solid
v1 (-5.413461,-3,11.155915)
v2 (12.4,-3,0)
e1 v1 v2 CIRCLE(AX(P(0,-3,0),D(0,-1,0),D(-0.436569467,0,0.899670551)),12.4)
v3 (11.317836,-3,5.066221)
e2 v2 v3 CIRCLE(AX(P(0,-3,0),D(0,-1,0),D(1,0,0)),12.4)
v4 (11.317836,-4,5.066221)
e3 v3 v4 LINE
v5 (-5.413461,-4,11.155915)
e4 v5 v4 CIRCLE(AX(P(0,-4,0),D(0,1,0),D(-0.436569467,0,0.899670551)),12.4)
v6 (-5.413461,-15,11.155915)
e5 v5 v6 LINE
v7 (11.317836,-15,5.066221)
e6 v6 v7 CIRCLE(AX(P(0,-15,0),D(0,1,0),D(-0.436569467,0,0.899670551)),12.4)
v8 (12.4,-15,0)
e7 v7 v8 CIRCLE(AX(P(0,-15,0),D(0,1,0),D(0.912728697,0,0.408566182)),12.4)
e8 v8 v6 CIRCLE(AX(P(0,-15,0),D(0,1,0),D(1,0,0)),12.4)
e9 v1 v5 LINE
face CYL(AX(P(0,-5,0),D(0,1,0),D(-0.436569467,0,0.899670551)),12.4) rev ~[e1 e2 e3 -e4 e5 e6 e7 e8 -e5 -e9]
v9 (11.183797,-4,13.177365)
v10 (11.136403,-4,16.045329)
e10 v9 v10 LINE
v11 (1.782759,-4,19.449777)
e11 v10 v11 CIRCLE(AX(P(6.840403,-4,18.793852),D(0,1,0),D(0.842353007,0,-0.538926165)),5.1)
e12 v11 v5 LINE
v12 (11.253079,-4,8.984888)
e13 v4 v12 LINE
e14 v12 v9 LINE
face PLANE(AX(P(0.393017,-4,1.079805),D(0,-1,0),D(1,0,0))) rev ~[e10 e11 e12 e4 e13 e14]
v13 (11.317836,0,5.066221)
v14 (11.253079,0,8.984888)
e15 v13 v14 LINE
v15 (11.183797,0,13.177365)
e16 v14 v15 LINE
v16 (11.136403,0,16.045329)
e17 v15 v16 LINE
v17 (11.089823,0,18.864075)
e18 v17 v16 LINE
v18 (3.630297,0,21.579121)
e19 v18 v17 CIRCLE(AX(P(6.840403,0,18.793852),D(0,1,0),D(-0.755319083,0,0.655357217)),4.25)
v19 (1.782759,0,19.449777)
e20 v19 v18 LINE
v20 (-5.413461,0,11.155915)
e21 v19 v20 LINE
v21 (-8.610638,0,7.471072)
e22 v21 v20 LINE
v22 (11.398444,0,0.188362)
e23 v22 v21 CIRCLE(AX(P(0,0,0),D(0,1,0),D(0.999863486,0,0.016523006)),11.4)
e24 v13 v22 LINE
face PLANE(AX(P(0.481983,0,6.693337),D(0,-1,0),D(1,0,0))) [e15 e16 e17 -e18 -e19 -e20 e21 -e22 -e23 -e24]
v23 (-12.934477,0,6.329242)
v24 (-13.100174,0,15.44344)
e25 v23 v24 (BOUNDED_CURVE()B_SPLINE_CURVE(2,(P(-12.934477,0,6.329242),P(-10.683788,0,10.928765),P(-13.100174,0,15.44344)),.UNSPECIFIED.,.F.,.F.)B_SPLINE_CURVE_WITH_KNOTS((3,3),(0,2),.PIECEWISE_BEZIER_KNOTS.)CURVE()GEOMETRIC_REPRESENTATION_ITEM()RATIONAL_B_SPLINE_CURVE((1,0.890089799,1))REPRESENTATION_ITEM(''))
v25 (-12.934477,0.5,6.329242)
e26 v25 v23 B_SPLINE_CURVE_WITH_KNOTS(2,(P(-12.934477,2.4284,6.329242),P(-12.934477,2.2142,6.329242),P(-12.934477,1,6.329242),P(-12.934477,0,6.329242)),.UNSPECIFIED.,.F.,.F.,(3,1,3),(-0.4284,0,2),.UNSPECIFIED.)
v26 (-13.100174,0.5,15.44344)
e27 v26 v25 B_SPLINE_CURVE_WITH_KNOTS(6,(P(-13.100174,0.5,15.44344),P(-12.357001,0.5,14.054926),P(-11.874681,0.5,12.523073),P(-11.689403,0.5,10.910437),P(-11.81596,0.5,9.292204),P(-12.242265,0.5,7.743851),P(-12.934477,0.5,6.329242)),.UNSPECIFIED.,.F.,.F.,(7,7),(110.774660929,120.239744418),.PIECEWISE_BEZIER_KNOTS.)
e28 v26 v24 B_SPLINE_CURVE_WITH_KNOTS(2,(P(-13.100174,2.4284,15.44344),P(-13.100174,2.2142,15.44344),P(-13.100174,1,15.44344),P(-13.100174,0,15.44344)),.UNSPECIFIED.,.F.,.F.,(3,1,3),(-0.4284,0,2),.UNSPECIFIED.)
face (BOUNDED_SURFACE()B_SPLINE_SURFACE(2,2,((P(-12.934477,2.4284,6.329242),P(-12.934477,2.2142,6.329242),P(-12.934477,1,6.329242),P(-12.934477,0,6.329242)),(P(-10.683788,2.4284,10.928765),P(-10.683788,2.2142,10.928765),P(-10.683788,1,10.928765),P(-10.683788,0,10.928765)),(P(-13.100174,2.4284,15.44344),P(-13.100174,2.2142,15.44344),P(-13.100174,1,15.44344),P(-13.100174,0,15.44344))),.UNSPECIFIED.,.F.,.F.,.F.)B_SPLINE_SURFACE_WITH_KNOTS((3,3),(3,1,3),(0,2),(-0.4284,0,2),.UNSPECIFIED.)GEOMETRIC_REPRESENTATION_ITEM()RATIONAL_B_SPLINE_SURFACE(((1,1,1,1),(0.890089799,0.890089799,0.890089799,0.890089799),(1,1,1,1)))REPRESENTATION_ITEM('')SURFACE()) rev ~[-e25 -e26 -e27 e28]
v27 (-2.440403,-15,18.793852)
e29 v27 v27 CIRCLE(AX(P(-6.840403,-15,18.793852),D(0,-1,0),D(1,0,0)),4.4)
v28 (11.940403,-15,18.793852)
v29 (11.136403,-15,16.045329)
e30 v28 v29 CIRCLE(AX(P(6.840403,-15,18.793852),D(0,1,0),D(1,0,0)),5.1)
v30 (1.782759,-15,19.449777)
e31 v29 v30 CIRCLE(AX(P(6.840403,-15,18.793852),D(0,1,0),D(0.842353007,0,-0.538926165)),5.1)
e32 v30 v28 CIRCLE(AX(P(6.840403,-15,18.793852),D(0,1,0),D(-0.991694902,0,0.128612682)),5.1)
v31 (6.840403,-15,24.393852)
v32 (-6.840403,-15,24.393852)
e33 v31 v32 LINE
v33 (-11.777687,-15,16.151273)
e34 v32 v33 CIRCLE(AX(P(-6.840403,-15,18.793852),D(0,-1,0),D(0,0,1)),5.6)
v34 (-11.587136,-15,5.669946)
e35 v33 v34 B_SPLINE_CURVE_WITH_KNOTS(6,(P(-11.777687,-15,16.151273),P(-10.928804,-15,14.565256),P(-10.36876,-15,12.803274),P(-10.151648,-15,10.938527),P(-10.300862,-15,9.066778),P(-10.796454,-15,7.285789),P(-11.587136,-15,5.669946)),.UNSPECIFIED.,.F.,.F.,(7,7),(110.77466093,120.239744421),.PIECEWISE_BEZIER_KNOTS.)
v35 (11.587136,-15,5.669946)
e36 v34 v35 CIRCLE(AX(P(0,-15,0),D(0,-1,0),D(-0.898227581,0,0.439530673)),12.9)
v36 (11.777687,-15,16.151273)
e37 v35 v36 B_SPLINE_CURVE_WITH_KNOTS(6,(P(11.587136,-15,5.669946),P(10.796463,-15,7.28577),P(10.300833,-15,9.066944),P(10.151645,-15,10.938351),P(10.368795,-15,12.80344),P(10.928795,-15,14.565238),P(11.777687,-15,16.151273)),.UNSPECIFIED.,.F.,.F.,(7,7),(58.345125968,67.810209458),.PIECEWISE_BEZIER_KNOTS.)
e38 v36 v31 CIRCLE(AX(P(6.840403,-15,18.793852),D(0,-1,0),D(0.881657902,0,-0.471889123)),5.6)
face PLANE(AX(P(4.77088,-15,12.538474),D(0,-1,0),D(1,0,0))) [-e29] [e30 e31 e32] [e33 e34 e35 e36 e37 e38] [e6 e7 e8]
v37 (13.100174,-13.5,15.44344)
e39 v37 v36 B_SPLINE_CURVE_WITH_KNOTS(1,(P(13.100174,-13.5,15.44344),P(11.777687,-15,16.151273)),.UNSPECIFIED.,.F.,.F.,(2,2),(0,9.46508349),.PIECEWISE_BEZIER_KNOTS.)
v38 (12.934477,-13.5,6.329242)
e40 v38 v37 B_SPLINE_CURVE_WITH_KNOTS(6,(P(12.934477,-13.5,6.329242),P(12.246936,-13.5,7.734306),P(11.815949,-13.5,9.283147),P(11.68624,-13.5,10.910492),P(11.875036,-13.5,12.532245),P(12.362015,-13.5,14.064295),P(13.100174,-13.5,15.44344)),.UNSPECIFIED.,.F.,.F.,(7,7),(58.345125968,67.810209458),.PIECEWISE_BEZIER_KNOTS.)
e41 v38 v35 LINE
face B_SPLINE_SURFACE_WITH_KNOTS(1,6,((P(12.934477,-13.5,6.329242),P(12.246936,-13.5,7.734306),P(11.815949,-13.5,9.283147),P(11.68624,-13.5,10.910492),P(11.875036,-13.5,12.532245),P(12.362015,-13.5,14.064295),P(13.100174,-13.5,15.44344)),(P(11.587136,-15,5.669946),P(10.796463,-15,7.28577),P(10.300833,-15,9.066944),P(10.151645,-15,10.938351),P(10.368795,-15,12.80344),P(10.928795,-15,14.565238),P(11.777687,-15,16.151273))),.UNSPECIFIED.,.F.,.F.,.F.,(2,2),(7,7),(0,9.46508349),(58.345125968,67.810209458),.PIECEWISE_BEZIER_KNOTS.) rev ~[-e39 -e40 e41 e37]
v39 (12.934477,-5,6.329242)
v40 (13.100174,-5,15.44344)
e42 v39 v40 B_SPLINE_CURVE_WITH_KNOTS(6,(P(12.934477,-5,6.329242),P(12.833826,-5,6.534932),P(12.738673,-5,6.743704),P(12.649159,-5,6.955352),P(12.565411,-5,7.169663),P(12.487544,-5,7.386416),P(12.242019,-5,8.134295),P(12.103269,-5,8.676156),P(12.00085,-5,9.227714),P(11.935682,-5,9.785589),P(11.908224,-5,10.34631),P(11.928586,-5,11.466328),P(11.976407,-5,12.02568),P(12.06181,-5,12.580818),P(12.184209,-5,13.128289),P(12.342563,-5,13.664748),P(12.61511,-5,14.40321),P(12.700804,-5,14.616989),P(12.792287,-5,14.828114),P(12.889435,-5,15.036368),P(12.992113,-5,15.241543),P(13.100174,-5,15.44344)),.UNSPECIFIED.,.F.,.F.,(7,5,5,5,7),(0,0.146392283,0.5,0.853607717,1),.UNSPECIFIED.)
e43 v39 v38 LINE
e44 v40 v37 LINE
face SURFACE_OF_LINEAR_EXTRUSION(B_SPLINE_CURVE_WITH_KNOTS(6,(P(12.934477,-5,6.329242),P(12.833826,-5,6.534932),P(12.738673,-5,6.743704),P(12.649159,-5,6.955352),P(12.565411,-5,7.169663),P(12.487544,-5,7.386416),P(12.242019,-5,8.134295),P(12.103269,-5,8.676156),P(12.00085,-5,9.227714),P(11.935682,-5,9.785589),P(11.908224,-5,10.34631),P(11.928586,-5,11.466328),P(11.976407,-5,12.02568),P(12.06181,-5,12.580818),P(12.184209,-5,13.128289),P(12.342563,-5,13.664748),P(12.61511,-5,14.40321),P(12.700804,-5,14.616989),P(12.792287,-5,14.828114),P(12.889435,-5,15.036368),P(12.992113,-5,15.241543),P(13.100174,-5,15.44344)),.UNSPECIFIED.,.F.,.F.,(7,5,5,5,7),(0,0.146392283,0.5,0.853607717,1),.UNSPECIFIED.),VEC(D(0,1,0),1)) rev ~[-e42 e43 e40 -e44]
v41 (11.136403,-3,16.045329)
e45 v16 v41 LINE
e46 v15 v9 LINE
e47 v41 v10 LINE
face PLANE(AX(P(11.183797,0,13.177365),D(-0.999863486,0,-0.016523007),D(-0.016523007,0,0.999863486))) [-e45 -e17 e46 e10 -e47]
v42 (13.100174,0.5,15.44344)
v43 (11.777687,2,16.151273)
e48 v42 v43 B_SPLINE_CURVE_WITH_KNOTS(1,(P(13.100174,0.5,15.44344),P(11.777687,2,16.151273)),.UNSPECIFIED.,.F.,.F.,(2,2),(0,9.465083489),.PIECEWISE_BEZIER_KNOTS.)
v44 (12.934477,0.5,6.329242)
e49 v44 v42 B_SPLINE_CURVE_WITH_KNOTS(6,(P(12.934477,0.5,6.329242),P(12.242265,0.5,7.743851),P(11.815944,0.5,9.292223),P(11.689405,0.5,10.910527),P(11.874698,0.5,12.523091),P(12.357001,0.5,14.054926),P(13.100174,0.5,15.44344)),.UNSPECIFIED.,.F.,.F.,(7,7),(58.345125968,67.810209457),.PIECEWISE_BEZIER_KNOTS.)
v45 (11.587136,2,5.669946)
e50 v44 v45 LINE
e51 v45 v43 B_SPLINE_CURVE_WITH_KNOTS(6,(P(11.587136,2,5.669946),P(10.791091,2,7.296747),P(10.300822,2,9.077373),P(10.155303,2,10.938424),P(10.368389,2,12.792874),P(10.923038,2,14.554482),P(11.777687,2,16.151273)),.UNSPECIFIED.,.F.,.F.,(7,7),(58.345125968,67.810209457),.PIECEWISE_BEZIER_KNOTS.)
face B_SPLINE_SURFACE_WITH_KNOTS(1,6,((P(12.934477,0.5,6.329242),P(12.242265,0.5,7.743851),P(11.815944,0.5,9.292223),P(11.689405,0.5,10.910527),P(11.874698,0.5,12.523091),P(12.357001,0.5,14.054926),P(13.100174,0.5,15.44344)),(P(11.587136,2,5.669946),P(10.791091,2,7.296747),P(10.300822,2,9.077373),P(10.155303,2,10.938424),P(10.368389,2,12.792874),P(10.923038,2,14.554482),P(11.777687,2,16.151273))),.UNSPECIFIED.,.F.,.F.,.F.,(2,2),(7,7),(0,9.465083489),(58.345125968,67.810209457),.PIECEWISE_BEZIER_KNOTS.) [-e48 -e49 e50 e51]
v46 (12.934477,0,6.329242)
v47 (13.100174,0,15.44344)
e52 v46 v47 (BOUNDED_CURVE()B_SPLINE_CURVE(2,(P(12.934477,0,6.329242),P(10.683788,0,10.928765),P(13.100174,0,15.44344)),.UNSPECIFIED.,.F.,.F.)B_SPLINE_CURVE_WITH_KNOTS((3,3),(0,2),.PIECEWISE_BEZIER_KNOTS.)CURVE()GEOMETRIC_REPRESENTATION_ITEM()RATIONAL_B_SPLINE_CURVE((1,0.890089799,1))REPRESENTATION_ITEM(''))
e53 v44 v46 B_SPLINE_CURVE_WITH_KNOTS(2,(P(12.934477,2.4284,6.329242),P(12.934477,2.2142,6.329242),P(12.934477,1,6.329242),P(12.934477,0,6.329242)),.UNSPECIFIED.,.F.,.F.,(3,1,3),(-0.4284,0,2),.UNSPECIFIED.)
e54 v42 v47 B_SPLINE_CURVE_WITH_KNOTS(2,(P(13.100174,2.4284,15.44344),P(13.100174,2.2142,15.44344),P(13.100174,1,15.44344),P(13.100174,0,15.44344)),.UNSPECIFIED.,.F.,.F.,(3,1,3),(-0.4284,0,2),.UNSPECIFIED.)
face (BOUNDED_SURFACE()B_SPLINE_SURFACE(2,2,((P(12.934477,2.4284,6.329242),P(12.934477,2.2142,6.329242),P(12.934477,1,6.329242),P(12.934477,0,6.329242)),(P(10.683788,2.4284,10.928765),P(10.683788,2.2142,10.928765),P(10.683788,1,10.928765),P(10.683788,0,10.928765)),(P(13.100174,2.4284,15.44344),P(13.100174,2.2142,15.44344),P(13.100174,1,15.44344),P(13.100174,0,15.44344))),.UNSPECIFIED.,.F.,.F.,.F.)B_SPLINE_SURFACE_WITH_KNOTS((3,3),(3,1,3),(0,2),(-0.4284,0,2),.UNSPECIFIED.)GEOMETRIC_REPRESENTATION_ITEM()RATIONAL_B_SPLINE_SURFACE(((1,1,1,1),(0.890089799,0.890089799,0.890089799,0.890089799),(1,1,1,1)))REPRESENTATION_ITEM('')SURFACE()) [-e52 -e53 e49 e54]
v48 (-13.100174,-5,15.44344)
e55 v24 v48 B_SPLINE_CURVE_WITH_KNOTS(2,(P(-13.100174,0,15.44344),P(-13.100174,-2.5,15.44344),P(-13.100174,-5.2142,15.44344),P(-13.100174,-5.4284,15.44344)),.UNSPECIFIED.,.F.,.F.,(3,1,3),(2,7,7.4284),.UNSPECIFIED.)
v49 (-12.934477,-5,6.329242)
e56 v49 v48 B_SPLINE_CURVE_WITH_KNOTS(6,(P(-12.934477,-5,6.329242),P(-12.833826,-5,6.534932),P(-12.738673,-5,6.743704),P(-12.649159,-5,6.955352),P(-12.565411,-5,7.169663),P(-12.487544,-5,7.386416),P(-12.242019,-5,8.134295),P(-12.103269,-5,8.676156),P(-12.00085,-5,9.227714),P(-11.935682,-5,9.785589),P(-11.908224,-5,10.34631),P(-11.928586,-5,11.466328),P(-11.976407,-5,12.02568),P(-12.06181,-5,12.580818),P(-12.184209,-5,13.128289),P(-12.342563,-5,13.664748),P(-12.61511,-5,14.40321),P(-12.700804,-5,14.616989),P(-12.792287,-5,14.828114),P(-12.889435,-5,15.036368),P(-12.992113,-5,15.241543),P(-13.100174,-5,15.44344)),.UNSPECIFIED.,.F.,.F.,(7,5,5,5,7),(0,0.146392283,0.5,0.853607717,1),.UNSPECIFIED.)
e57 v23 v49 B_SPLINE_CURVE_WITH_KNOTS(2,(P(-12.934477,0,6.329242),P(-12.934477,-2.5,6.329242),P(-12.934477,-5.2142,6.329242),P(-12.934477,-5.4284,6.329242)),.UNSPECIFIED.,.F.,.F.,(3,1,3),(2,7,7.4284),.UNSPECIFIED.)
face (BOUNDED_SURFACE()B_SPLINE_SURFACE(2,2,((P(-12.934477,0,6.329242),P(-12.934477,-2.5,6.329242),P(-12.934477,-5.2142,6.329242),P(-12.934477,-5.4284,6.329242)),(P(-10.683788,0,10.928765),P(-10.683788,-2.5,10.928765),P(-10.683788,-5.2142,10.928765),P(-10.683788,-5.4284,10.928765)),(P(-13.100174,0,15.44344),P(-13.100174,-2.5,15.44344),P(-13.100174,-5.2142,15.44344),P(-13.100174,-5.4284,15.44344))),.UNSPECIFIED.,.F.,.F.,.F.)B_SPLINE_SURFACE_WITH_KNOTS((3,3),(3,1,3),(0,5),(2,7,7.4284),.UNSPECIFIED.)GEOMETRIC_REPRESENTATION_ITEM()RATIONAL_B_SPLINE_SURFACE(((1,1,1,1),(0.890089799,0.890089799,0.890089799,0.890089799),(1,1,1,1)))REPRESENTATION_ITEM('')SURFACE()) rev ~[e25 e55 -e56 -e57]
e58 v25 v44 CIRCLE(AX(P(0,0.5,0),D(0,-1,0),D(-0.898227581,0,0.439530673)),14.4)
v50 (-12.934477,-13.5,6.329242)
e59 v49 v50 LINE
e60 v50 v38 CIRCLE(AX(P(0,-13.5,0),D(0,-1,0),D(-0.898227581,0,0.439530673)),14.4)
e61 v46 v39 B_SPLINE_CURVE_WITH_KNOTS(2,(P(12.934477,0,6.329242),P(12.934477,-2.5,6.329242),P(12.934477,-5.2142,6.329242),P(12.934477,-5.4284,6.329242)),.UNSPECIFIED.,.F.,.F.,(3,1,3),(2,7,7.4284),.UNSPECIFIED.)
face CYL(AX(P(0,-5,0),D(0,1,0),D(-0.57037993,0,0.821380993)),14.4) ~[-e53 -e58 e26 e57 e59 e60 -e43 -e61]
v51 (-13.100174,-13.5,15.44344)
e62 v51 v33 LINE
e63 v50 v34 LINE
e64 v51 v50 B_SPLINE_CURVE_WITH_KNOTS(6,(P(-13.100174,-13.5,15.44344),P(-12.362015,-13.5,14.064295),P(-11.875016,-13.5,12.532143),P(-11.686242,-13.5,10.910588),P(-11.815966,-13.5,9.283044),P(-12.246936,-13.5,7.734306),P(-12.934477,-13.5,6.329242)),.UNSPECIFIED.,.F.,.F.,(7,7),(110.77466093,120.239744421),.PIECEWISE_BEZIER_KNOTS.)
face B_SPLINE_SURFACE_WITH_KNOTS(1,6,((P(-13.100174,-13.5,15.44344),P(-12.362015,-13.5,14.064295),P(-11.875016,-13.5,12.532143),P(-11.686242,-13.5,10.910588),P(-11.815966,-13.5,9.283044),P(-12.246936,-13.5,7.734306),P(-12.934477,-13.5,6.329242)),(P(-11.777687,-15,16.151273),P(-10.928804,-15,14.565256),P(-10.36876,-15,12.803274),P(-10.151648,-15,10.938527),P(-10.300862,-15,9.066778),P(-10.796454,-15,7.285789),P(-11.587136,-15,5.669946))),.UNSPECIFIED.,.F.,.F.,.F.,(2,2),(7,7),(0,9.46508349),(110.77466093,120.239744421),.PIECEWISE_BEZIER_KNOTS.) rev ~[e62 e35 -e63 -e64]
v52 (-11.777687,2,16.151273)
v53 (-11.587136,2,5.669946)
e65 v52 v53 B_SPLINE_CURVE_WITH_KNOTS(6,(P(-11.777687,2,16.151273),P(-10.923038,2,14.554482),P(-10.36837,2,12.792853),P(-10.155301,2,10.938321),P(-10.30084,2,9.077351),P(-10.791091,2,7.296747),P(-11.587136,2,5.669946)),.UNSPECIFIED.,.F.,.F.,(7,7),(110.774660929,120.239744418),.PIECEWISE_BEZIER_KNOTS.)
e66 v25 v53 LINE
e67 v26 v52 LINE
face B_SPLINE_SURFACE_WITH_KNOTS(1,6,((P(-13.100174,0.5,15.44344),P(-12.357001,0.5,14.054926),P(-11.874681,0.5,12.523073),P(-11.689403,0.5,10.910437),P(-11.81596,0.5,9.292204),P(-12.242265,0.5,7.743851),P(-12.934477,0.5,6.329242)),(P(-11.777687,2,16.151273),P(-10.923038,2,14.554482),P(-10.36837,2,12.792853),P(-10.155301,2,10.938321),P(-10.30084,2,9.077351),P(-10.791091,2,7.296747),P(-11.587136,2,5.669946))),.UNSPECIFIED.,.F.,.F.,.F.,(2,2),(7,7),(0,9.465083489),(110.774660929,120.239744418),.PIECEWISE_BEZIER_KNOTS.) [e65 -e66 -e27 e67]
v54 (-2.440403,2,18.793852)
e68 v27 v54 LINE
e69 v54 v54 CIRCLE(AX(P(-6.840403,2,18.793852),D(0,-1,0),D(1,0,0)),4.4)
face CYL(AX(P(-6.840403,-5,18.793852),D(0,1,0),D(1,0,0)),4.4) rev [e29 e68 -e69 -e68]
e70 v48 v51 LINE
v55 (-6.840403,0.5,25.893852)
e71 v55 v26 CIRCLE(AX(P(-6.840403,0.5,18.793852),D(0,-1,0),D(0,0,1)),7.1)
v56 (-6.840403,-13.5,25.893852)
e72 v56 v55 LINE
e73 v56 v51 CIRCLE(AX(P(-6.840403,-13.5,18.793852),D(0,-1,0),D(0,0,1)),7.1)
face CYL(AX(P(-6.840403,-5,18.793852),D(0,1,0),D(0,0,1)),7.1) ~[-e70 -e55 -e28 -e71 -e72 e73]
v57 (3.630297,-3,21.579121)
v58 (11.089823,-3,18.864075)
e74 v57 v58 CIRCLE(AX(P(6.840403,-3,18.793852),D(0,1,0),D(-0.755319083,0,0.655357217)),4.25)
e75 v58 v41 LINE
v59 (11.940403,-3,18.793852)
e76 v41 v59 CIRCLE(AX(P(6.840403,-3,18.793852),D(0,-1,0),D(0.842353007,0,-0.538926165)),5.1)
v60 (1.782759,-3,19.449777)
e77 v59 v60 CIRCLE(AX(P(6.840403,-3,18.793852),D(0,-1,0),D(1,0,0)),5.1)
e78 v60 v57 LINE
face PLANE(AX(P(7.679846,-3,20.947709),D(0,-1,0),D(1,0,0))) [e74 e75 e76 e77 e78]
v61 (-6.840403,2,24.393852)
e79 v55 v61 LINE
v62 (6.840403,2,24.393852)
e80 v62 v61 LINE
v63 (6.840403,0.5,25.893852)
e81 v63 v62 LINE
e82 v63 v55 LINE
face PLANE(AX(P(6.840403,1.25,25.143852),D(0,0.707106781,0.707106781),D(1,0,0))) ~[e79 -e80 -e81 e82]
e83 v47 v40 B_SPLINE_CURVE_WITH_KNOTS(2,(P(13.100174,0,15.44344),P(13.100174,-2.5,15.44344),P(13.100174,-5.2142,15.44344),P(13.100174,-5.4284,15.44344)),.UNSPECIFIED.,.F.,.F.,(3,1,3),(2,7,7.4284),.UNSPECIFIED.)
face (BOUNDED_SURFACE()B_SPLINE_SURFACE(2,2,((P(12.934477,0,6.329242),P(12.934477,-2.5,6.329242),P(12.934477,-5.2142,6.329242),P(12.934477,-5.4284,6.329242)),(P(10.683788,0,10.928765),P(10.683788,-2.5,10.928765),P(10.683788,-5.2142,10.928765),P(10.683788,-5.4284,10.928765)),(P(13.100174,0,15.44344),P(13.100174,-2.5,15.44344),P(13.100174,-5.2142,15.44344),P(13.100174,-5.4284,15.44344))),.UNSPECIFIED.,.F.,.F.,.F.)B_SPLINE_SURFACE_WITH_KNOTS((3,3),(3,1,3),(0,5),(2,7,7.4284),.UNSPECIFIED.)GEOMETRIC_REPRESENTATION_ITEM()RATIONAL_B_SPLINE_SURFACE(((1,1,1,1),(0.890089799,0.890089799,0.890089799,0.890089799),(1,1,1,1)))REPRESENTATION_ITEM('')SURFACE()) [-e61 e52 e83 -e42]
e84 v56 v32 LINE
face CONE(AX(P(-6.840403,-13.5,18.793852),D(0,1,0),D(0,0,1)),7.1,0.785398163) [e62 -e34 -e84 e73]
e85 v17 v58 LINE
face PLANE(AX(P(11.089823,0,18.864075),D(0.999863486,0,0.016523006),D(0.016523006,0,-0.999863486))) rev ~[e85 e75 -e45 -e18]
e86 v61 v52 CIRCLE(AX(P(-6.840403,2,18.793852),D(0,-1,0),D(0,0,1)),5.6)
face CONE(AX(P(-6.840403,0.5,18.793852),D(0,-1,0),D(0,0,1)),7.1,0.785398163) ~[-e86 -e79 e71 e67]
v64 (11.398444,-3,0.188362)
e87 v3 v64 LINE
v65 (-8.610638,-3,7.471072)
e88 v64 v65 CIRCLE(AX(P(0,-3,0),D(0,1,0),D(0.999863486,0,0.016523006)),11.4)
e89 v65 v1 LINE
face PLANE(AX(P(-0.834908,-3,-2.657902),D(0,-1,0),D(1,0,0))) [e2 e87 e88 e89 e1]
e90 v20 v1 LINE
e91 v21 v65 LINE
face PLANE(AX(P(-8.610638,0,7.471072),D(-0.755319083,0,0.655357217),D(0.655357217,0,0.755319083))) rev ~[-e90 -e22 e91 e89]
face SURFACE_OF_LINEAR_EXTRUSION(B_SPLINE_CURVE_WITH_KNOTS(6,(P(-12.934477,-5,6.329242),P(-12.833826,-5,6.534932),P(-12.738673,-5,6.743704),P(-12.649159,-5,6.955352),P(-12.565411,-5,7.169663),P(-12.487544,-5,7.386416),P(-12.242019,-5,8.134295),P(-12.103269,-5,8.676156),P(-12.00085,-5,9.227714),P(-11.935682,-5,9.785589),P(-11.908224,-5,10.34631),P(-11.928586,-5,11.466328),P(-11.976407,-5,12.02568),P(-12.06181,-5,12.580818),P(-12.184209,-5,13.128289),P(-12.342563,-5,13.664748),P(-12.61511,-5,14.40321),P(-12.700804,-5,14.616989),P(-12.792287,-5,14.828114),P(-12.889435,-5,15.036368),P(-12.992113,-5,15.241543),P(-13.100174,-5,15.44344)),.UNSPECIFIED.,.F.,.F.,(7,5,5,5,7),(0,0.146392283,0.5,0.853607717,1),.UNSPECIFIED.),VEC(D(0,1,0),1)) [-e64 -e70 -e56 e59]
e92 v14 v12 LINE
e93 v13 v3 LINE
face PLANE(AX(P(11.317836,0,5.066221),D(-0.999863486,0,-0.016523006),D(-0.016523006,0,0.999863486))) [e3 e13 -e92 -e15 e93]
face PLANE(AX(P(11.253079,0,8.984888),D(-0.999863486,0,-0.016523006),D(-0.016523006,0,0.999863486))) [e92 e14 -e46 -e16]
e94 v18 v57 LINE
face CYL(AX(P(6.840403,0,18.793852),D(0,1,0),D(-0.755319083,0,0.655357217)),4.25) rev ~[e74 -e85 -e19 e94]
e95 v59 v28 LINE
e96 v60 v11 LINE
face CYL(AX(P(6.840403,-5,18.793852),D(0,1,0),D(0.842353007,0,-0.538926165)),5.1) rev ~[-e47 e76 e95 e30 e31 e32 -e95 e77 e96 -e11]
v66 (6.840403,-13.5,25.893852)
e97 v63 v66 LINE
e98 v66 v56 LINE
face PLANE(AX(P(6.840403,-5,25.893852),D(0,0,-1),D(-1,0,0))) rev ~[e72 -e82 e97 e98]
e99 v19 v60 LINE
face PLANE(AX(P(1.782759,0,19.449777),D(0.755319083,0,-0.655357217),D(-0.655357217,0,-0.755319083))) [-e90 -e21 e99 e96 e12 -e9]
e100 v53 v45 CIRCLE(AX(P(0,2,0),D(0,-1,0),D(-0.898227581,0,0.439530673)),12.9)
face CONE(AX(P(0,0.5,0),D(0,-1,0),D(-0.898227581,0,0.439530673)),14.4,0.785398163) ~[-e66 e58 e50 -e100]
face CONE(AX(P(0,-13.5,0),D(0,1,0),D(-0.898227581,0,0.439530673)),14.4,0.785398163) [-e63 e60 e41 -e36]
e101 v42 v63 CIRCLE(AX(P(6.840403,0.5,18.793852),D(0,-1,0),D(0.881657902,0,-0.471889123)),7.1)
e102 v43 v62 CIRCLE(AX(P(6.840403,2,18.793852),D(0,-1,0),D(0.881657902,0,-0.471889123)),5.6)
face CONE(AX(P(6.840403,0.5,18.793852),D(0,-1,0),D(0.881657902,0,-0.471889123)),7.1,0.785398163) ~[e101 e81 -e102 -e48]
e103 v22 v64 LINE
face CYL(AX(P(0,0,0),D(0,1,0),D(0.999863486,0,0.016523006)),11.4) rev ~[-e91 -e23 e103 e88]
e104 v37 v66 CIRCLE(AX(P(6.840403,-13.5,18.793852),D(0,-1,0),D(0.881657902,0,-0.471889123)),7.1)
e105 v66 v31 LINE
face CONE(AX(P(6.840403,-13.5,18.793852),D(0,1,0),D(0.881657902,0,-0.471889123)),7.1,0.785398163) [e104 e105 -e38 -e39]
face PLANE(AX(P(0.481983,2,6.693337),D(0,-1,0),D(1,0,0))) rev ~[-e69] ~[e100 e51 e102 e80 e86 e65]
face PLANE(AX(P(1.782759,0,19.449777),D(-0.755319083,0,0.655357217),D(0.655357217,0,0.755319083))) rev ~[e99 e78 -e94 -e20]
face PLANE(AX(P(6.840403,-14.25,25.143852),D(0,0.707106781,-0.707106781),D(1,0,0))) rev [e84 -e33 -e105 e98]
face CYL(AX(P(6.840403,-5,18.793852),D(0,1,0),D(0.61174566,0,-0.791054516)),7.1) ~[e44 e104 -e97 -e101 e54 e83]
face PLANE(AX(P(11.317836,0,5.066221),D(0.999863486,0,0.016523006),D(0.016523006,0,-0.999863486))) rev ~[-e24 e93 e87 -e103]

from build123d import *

# Parameters (mm, degrees)
F0_R     = 4.4
F1_DEPTH = 5
F2_DEPTH = 2
F3_R     = 10
F4_DEPTH = 3
F5_DEPTH = 4
F6_DEPTH = 10
F7_SIZE  = 1.5


with BuildPart() as f1:
    # F0 (on Front) → F1 (new body)
    with BuildSketch(Plane.XZ):
        with BuildLine():
            ThreePointArc((-5.4134613959, 11.1559148309), (4.2410497772, 11.6521884977), (11.3178358484, 5.0662206533))
            Line((11.3178358484, 5.0662206533), (11.2530788382, 8.9848882386))
            ThreePointArc((11.2530788382, 8.9848882386), (9.8365288611, 10.5167818254), (8.2134709888, 11.8278862996))
            ThreePointArc((8.2134709888, 11.8278862996), (9.7771968263, 12.3297019504), (11.1837970537, 13.1773653522))
            Line((11.1837970537, 13.1773653522), (11.1364032022, 16.0453289729))
            ThreePointArc((11.1364032022, 16.0453289729), (5.0961001356, 14.0014200497), (1.7827588677, 19.4497770926))
            Line((1.7827588677, 19.4497770926), (-5.4134613959, 11.1559148309))
        make_face()
        with BuildLine():
            ThreePointArc((11.3178358484, 5.0662206533), (12.1264414508, 2.5902543774), (12.4, 0))
            ThreePointArc((12.4, 0), (-6.5815301675, -10.5092083743), (-5.4134613959, 11.1559148309))
            Line((-5.4134613959, 11.1559148309), (1.7827588677, 19.4497770926))
            ThreePointArc((1.7827588677, 19.4497770926), (7.1690482729, 23.8832523997), (11.9404028665, 18.7938524157))
            ThreePointArc((11.9404028665, 18.7938524157), (11.7352778247, 17.362000767), (11.1364032022, 16.0453289729))
            Line((11.1364032022, 16.0453289729), (11.1837970537, 13.1773653522))
            ThreePointArc((11.1837970537, 13.1773653522), (13.5592963078, 21.0887316989), (6.8404028665, 25.8938524157))
            Line((6.8404028665, 25.8938524157), (-6.8404028665, 25.8938524157))
            ThreePointArc((-6.8404028665, 25.8938524157), (-13.9068149485, 19.4836496958), (-8.2134709888, 11.8278862996))
            ThreePointArc((-8.2134709888, 11.8278862996), (-2.0809765648, -14.2488433403), (11.2530788382, 8.9848882386))
            Line((11.2530788382, 8.9848882386), (11.3178358484, 5.0662206533))
        make_face()
        with Locations((-6.8404028665, 18.7938524157)):
            Circle(F0_R, mode=Mode.SUBTRACT)
    extrude(amount=F1_DEPTH)

    # F0 (on Front) → F2 (join)
    with BuildSketch(Plane.XZ):
        with BuildLine():
            ThreePointArc((11.3178358484, 5.0662206533), (12.1264414508, 2.5902543774), (12.4, 0))
            ThreePointArc((12.4, 0), (-6.5815301675, -10.5092083743), (-5.4134613959, 11.1559148309))
            Line((-5.4134613959, 11.1559148309), (1.7827588677, 19.4497770926))
            ThreePointArc((1.7827588677, 19.4497770926), (7.1690482729, 23.8832523997), (11.9404028665, 18.7938524157))
            ThreePointArc((11.9404028665, 18.7938524157), (11.7352778247, 17.362000767), (11.1364032022, 16.0453289729))
            Line((11.1364032022, 16.0453289729), (11.1837970537, 13.1773653522))
            ThreePointArc((11.1837970537, 13.1773653522), (13.5592963078, 21.0887316989), (6.8404028665, 25.8938524157))
            Line((6.8404028665, 25.8938524157), (-6.8404028665, 25.8938524157))
            ThreePointArc((-6.8404028665, 25.8938524157), (-13.9068149485, 19.4836496958), (-8.2134709888, 11.8278862996))
            ThreePointArc((-8.2134709888, 11.8278862996), (-2.0809765648, -14.2488433403), (11.2530788382, 8.9848882386))
            Line((11.2530788382, 8.9848882386), (11.3178358484, 5.0662206533))
        make_face()
        with Locations((-6.8404028665, 18.7938524157)):
            Circle(F0_R, mode=Mode.SUBTRACT)
        with BuildLine():
            ThreePointArc((-5.4134613959, 11.1559148309), (4.2410497772, 11.6521884977), (11.3178358484, 5.0662206533))
            Line((11.3178358484, 5.0662206533), (11.2530788382, 8.9848882386))
            ThreePointArc((11.2530788382, 8.9848882386), (9.8365288611, 10.5167818254), (8.2134709888, 11.8278862996))
            ThreePointArc((8.2134709888, 11.8278862996), (9.7771968263, 12.3297019504), (11.1837970537, 13.1773653522))
            Line((11.1837970537, 13.1773653522), (11.1364032022, 16.0453289729))
            ThreePointArc((11.1364032022, 16.0453289729), (5.0961001356, 14.0014200497), (1.7827588677, 19.4497770926))
            Line((1.7827588677, 19.4497770926), (-5.4134613959, 11.1559148309))
        make_face()
        with BuildLine():
            ThreePointArc((11.0898226812, 18.8640751933), (8.2939884756, 22.7875460541), (3.6302967624, 21.5791205895))
            ThreePointArc((3.6302967624, 21.5791205895), (5.3538718279, 14.8123042908), (11.0904028665, 18.7938524157))
            ThreePointArc((11.0904028665, 18.7938524157), (11.0902578177, 18.8289650029), (11.0898226812, 18.8640751933))
        make_face()
        with BuildLine():
            Line((3.6302967624, 21.5791205895), (1.7827588677, 19.4497770926))
            ThreePointArc((1.7827588677, 19.4497770926), (5.0961001356, 14.0014200497), (11.1364032022, 16.0453289729))
            Line((11.1364032022, 16.0453289729), (11.0898226812, 18.8640751933))
            ThreePointArc((11.0898226812, 18.8640751933), (11.0902578177, 18.8289650029), (11.0904028665, 18.7938524157))
            ThreePointArc((11.0904028665, 18.7938524157), (5.3538718279, 14.8123042908), (3.6302967624, 21.5791205895))
        make_face()
        with BuildLine():
            ThreePointArc((11.9404028665, 18.7938524157), (7.1690482729, 23.8832523997), (1.7827588677, 19.4497770926))
            Line((1.7827588677, 19.4497770926), (3.6302967624, 21.5791205895))
            ThreePointArc((3.6302967624, 21.5791205895), (8.2939884756, 22.7875460541), (11.0898226812, 18.8640751933))
            Line((11.0898226812, 18.8640751933), (11.1364032022, 16.0453289729))
            ThreePointArc((11.1364032022, 16.0453289729), (11.7352778247, 17.362000767), (11.9404028665, 18.7938524157))
        make_face()
        with BuildLine():
            Line((11.3984437382, 0.188362274), (11.3178358484, 5.0662206533))
            ThreePointArc((11.3178358484, 5.0662206533), (4.2410497772, 11.6521884977), (-5.4134613959, 11.1559148309))
            Line((-5.4134613959, 11.1559148309), (-8.61063755, 7.471072278))
            ThreePointArc((-8.61063755, 7.471072278), (-3.8990296339, -10.712495877), (11.3984437382, 0.188362274))
        make_face()
        with BuildLine():
            ThreePointArc((-5.4134613959, 11.1559148309), (-6.5815301675, -10.5092083743), (12.4, 0))
            ThreePointArc((12.4, 0), (12.1264414508, 2.5902543774), (11.3178358484, 5.0662206533))
            Line((11.3178358484, 5.0662206533), (11.3984437382, 0.188362274))
            ThreePointArc((11.3984437382, 0.188362274), (-3.8990296339, -10.712495877), (-8.61063755, 7.471072278))
            Line((-8.61063755, 7.471072278), (-5.4134613959, 11.1559148309))
        make_face()
    extrude(amount=-F2_DEPTH)

    # F3
    f3_edges = [f1.edges().sort_by_distance(p)[0] for p in [
        (8.213471, -1.5, 11.827886),
        (-8.213471, -1.5, 11.827886),
    ]]
    fillet(f3_edges, radius=F3_R)

    # F0 (on Front) → F4 (join)
    with BuildSketch(Plane.XZ):
        with BuildLine():
            ThreePointArc((-5.4134613959, 11.1559148309), (-6.5815301675, -10.5092083743), (12.4, 0))
            ThreePointArc((12.4, 0), (12.1264414508, 2.5902543774), (11.3178358484, 5.0662206533))
            Line((11.3178358484, 5.0662206533), (11.3984437382, 0.188362274))
            ThreePointArc((11.3984437382, 0.188362274), (-3.8990296339, -10.712495877), (-8.61063755, 7.471072278))
            Line((-8.61063755, 7.471072278), (-5.4134613959, 11.1559148309))
        make_face()
        with BuildLine():
            ThreePointArc((11.9404028665, 18.7938524157), (7.1690482729, 23.8832523997), (1.7827588677, 19.4497770926))
            Line((1.7827588677, 19.4497770926), (3.6302967624, 21.5791205895))
            ThreePointArc((3.6302967624, 21.5791205895), (8.2939884756, 22.7875460541), (11.0898226812, 18.8640751933))
            Line((11.0898226812, 18.8640751933), (11.1364032022, 16.0453289729))
            ThreePointArc((11.1364032022, 16.0453289729), (11.7352778247, 17.362000767), (11.9404028665, 18.7938524157))
        make_face()
    extrude(amount=F4_DEPTH)

    # F0 (on Front) → F5 (cut)
    with BuildSketch(Plane.XZ):
        with BuildLine():
            Line((11.3984437382, 0.188362274), (11.3178358484, 5.0662206533))
            ThreePointArc((11.3178358484, 5.0662206533), (4.2410497772, 11.6521884977), (-5.4134613959, 11.1559148309))
            Line((-5.4134613959, 11.1559148309), (-8.61063755, 7.471072278))
            ThreePointArc((-8.61063755, 7.471072278), (-3.8990296339, -10.712495877), (11.3984437382, 0.188362274))
        make_face()
        with BuildLine():
            ThreePointArc((-5.4134613959, 11.1559148309), (4.2410497772, 11.6521884977), (11.3178358484, 5.0662206533))
            Line((11.3178358484, 5.0662206533), (11.2530788382, 8.9848882386))
            ThreePointArc((11.2530788382, 8.9848882386), (9.8365288611, 10.5167818254), (8.2134709888, 11.8278862996))
            ThreePointArc((8.2134709888, 11.8278862996), (9.7771968263, 12.3297019504), (11.1837970537, 13.1773653522))
            Line((11.1837970537, 13.1773653522), (11.1364032022, 16.0453289729))
            ThreePointArc((11.1364032022, 16.0453289729), (5.0961001356, 14.0014200497), (1.7827588677, 19.4497770926))
            Line((1.7827588677, 19.4497770926), (-5.4134613959, 11.1559148309))
        make_face()
        with BuildLine():
            Line((3.6302967624, 21.5791205895), (1.7827588677, 19.4497770926))
            ThreePointArc((1.7827588677, 19.4497770926), (5.0961001356, 14.0014200497), (11.1364032022, 16.0453289729))
            Line((11.1364032022, 16.0453289729), (11.0898226812, 18.8640751933))
            ThreePointArc((11.0898226812, 18.8640751933), (11.0902578177, 18.8289650029), (11.0904028665, 18.7938524157))
            ThreePointArc((11.0904028665, 18.7938524157), (5.3538718279, 14.8123042908), (3.6302967624, 21.5791205895))
        make_face()
        with BuildLine():
            ThreePointArc((11.0898226812, 18.8640751933), (8.2939884756, 22.7875460541), (3.6302967624, 21.5791205895))
            ThreePointArc((3.6302967624, 21.5791205895), (5.3538718279, 14.8123042908), (11.0904028665, 18.7938524157))
            ThreePointArc((11.0904028665, 18.7938524157), (11.0902578177, 18.8289650029), (11.0898226812, 18.8640751933))
        make_face()
        with BuildLine():
            ThreePointArc((8.2134709888, 11.8278862996), (9.8365288611, 10.5167818254), (11.2530788382, 8.9848882386))
            Line((11.2530788382, 8.9848882386), (11.1837970537, 13.1773653522))
            ThreePointArc((11.1837970537, 13.1773653522), (9.7771968263, 12.3297019504), (8.2134709888, 11.8278862996))
        make_face()
    extrude(amount=F5_DEPTH, mode=Mode.SUBTRACT)

    # F6 (add): a face of the model
    f6_faces = [f1.faces().sort_by_distance(p)[0] for p in [
        (12.5064069452, -5, 22.1877746808),
    ]]
    extrude(f6_faces, amount=F6_DEPTH)

    # F7
    f7_edges = [f1.edges().sort_by_distance(p)[0] for p in [
        (0, 2, -14.4),
        (0, -15, -14.4),
        (12.931295, -15, 22.442281),
        (12.931295, 2, 22.442281),
        (-11.918405, 2, 10.906319),
        (11.918405, 2, 10.906319),
        (-12.931295, 2, 22.442281),
        (0, 2, 25.893852),
        (-12.931295, -15, 22.442281),
        (-11.918405, -15, 10.906319),
        (0, -15, 25.893852),
        (11.918405, -15, 10.906319),
    ]]
    chamfer(f7_edges, length=F7_SIZE)


solid = f1.part
